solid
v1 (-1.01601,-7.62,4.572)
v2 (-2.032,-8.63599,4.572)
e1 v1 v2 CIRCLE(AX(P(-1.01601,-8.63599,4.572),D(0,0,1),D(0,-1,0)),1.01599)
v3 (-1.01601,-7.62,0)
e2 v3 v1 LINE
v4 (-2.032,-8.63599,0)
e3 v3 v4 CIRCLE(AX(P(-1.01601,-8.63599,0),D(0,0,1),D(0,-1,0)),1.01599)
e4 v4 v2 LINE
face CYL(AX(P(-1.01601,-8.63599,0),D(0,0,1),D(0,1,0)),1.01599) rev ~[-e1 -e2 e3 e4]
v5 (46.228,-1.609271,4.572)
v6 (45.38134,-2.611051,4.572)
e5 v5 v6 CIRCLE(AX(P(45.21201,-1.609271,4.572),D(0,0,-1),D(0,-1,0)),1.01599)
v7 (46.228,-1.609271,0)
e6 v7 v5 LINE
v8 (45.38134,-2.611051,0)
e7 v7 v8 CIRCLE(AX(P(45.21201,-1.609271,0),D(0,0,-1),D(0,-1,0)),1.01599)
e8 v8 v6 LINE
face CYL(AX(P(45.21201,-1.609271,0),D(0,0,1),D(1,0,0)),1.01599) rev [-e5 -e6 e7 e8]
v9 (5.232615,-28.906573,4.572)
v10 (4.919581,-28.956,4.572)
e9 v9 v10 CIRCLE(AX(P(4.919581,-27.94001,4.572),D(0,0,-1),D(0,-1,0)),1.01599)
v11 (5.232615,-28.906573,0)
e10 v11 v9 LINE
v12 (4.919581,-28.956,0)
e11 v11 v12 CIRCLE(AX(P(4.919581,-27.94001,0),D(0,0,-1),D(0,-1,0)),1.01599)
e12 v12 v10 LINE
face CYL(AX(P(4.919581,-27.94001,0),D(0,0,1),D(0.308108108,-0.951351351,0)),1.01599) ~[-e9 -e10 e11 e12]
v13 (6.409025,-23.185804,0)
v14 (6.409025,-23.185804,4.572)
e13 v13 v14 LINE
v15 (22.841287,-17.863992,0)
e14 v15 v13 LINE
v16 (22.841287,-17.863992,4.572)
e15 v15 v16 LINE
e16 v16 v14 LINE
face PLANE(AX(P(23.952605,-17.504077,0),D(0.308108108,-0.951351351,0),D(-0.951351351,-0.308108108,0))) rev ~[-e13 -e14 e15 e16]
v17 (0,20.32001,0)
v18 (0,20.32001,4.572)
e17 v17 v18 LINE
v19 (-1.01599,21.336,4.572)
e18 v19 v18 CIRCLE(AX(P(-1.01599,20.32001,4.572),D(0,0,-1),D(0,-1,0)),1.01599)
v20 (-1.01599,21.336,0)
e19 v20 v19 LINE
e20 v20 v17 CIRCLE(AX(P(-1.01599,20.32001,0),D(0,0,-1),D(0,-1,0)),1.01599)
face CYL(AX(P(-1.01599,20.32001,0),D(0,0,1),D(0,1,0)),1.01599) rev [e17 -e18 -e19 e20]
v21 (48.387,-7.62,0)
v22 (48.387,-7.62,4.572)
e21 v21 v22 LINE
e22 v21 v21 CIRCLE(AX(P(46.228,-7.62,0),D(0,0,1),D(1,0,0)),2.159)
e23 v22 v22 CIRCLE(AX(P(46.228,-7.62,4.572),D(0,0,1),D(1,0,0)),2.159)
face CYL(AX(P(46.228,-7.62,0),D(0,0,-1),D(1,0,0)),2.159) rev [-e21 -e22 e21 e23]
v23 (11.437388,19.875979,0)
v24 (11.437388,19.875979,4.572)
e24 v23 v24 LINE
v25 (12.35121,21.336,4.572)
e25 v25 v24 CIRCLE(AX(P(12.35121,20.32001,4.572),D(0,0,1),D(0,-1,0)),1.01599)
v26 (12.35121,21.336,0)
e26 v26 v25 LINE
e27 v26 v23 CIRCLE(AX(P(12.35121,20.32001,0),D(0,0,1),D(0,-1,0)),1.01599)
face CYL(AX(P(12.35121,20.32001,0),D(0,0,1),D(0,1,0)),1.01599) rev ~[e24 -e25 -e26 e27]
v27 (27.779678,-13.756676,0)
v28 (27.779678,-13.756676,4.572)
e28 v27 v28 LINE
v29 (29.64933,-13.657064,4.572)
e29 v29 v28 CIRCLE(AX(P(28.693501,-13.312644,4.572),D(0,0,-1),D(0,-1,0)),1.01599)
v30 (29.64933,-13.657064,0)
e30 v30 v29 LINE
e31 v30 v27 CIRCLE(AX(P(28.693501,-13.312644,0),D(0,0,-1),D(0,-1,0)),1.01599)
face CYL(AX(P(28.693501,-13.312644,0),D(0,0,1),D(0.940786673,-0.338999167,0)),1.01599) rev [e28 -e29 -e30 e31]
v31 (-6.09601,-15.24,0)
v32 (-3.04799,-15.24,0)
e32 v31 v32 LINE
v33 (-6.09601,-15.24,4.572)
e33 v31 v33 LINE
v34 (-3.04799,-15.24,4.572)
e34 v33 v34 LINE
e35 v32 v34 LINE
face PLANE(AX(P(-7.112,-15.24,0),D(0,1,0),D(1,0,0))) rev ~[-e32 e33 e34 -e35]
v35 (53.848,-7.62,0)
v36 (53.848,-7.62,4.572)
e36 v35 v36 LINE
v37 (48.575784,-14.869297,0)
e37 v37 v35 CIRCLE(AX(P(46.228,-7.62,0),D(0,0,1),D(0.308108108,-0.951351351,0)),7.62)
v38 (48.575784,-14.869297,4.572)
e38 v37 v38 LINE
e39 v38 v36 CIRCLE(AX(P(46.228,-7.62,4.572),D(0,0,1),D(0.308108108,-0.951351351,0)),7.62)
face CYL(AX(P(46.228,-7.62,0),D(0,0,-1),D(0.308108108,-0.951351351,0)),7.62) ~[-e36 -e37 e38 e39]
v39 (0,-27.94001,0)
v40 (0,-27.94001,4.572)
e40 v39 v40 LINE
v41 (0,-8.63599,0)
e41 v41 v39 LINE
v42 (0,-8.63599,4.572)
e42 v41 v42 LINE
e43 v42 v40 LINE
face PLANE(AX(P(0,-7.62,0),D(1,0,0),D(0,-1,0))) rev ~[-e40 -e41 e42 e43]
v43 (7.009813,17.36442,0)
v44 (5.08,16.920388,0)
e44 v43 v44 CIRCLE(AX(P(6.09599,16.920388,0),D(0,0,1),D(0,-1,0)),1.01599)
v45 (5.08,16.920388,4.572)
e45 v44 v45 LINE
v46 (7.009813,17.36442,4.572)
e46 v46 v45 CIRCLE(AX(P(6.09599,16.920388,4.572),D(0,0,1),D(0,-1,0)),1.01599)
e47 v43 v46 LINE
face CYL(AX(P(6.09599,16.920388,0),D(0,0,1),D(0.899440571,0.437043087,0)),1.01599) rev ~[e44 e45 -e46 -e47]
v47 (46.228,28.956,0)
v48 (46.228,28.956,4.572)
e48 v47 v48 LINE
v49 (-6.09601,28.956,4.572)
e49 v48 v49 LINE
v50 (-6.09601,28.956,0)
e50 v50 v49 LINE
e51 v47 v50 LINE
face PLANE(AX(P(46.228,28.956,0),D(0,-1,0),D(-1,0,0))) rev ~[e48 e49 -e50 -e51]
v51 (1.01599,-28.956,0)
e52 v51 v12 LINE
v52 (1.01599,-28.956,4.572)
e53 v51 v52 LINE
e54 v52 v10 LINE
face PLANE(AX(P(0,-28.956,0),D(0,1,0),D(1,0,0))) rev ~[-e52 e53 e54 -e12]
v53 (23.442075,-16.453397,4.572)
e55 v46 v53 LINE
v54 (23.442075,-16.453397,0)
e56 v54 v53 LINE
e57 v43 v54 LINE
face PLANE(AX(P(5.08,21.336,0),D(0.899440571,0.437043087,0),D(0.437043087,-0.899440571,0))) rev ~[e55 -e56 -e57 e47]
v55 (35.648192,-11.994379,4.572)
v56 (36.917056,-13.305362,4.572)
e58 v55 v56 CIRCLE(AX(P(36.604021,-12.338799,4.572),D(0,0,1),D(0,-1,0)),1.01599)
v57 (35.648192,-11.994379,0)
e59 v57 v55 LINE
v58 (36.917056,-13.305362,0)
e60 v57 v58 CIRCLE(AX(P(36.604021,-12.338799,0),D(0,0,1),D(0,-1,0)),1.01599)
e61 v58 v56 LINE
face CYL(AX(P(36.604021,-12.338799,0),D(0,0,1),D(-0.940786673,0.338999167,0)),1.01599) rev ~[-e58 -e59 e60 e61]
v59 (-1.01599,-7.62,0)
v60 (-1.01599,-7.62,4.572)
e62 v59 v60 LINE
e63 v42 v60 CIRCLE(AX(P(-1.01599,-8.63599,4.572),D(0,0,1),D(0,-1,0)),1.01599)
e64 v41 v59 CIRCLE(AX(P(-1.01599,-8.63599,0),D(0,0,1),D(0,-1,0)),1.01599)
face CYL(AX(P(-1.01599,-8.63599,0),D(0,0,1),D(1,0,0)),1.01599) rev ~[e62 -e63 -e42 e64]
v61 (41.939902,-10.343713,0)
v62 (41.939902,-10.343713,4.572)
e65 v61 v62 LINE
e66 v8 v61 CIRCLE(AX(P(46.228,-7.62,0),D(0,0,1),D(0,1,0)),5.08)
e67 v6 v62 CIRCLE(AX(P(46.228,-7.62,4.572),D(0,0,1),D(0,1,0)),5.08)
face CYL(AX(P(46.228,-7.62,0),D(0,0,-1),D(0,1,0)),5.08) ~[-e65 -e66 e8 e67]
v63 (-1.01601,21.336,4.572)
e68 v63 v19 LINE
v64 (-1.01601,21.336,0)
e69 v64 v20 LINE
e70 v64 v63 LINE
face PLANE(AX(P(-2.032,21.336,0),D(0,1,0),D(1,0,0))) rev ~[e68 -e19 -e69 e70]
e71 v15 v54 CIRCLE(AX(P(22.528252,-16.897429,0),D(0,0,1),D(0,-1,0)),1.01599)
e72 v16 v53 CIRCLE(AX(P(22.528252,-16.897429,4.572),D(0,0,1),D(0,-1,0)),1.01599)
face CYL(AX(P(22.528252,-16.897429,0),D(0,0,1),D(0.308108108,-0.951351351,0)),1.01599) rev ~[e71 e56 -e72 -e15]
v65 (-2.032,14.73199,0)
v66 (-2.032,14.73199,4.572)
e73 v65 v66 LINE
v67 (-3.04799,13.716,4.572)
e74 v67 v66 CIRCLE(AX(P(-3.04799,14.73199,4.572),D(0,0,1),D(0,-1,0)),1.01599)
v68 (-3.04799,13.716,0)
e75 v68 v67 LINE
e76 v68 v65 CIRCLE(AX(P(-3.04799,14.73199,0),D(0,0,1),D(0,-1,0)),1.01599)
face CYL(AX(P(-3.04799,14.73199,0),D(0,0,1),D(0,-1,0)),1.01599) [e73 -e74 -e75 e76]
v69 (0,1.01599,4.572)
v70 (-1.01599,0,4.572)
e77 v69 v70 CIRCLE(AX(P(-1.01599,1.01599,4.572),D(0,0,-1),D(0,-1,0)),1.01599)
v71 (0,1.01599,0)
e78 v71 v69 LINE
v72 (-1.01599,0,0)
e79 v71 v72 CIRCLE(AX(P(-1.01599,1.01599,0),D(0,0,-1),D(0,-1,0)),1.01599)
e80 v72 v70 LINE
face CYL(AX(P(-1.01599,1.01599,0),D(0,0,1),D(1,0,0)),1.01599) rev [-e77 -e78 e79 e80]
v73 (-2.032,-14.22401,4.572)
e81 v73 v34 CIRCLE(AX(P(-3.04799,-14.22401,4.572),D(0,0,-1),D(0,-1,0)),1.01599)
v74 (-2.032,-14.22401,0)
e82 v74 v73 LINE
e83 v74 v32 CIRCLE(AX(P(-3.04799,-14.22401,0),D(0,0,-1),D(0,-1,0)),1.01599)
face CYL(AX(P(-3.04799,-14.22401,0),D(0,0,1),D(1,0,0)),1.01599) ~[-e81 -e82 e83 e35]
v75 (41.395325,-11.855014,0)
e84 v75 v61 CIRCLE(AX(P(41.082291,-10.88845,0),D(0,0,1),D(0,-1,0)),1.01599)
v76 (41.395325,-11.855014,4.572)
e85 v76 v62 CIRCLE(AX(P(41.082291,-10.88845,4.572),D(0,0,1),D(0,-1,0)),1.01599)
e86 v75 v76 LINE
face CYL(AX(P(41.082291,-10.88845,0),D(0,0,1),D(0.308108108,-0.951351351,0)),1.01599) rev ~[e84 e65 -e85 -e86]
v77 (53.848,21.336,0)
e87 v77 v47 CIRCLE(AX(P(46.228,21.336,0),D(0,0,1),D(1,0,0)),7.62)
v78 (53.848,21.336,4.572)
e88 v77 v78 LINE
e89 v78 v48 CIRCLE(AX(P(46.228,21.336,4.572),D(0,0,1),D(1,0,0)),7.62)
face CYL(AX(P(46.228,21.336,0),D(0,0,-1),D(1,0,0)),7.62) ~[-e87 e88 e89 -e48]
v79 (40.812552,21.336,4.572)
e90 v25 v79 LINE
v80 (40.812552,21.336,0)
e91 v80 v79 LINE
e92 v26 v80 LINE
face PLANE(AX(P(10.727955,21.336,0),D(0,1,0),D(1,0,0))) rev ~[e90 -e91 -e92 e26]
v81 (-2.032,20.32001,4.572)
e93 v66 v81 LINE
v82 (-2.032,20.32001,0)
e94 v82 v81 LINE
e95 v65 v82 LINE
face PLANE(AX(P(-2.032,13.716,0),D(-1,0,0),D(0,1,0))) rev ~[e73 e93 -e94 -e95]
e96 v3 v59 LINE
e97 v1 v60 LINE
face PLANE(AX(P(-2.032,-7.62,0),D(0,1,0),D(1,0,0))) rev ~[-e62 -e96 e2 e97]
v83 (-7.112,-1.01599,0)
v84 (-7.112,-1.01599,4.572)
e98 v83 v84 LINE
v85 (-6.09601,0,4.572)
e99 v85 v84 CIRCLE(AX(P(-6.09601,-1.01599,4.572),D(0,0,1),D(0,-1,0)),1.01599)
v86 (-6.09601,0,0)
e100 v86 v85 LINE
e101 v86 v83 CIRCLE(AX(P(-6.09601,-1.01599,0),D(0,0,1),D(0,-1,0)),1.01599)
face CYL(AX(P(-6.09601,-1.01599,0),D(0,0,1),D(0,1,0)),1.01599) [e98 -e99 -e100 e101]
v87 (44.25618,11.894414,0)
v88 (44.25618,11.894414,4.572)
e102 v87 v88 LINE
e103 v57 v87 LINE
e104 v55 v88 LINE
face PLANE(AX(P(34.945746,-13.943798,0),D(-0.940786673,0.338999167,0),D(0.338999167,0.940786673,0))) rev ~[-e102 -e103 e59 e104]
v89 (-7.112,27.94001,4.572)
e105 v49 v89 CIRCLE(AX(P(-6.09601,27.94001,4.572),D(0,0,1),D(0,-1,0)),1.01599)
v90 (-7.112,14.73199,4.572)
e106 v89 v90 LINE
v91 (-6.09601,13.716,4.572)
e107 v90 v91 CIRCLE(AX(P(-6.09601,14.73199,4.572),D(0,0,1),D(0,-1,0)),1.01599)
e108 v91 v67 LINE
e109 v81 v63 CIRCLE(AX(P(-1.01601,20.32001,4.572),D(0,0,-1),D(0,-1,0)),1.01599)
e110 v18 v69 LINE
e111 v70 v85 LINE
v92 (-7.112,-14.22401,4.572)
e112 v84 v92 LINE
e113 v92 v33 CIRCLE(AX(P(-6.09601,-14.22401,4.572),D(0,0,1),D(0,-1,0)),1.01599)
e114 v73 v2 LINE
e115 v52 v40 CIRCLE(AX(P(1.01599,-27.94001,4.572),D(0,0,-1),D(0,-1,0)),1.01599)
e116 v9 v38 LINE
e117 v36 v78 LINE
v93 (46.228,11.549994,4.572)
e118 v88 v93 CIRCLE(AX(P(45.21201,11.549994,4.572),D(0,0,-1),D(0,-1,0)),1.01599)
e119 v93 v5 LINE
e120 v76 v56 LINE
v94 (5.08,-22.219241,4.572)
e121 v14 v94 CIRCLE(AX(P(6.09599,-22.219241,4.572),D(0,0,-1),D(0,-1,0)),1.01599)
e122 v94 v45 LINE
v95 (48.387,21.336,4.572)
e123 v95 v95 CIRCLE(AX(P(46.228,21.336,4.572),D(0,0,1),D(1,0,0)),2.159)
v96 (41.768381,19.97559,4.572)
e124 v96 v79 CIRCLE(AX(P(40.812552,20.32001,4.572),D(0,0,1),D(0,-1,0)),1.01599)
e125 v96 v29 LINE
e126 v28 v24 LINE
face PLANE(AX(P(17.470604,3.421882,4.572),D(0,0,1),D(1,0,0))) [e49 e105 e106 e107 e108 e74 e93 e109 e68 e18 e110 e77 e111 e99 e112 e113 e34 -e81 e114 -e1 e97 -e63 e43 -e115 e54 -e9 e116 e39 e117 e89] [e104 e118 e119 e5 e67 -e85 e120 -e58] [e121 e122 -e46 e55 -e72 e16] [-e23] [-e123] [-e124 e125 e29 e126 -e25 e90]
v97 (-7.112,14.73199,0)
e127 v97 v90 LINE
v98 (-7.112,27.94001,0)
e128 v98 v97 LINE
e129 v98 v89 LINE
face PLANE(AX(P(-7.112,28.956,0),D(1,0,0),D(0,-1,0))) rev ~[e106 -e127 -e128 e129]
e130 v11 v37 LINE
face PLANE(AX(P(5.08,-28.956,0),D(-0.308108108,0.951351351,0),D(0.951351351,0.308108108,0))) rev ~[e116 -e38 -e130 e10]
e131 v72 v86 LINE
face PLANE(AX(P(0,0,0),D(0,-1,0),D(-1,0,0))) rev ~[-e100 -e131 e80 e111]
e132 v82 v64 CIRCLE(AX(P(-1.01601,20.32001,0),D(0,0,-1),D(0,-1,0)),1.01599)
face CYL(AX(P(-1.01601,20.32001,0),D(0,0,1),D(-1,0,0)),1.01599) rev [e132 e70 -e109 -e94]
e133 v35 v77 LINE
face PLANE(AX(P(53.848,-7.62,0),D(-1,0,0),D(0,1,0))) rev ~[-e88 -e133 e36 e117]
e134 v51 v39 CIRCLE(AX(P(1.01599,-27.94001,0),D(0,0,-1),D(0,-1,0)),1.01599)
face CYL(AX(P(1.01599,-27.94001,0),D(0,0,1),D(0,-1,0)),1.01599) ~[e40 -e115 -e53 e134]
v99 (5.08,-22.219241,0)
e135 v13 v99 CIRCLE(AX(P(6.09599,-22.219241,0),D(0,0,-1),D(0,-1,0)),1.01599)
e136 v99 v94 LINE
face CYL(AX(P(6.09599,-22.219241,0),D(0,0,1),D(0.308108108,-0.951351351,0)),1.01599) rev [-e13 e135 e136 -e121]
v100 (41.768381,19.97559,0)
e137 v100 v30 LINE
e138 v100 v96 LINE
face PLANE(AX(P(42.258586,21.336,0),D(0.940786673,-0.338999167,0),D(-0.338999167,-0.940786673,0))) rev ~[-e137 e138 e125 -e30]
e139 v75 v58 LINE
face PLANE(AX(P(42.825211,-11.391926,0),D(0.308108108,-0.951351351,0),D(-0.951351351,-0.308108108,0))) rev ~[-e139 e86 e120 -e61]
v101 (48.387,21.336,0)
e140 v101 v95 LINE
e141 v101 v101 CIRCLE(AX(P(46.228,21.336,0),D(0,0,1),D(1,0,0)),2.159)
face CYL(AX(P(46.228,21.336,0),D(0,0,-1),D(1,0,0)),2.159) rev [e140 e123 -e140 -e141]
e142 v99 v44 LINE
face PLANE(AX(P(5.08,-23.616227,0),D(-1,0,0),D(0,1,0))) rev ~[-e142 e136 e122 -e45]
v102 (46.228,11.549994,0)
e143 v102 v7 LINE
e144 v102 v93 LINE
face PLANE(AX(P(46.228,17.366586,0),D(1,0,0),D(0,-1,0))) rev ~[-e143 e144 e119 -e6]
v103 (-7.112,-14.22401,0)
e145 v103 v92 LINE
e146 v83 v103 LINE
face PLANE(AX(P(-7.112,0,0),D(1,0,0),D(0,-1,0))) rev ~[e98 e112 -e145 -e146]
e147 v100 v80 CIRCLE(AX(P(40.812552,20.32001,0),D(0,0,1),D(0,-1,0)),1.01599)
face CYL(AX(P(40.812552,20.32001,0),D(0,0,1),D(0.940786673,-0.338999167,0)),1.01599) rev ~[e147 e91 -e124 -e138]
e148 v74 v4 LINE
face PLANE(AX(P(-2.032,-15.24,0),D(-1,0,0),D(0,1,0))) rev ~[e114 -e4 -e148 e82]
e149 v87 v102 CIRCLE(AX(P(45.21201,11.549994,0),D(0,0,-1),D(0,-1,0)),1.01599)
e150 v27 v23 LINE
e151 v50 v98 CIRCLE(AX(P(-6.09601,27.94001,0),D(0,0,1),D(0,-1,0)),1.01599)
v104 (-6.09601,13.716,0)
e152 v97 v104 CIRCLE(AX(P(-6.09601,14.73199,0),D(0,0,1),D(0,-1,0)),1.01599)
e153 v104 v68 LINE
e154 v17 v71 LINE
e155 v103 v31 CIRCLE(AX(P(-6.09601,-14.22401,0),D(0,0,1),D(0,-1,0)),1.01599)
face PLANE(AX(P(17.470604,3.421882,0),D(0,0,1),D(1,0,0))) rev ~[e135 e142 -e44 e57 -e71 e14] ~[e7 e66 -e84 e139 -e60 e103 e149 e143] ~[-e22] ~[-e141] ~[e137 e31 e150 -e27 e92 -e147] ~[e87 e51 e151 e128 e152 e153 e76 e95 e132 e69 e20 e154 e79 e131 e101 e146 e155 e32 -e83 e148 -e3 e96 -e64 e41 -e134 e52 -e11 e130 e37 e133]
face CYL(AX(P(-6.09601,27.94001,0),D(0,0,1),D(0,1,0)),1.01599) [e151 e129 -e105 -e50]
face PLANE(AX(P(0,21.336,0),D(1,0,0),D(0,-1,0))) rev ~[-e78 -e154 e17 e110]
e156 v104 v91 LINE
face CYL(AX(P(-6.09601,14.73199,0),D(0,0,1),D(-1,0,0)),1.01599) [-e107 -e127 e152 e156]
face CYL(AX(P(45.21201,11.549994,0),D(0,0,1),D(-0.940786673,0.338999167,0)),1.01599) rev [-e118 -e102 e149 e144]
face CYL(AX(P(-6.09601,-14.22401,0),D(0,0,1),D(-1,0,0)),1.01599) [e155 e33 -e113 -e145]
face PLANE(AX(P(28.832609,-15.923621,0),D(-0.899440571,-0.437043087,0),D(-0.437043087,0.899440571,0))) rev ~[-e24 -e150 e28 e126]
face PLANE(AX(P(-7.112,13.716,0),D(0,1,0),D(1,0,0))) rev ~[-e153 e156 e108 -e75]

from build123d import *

# Parameters (mm, degrees)
F0_R     = 2.159
F1_DEPTH = 4.572
F2_R     = 1.01599


# Not quite as in the source:
# - a fillet or chamfer is up to 0.001 mm smaller than in the source, because OpenCascade refuses the exact size


with BuildPart() as f1:
    # F0 (on Top) → F1 (new body)
    with BuildSketch(Plane.XY):
        with BuildLine():
            Line((46.228, 28.956), (-7.112, 28.956))
            Line((-7.112, 28.956), (-7.112, 13.716))
            Line((-7.112, 13.716), (-2.032, 13.716))
            Line((-2.032, 13.716), (-2.032, 21.336))
            Line((-2.032, 21.336), (0, 21.336))
            Line((0, 21.336), (0, 0))
            Line((0, 0), (-7.112, 0))
            Line((-7.112, 0), (-7.112, -15.24))
            Line((-7.112, -15.24), (-2.032, -15.24))
            Line((-2.032, -15.24), (-2.032, -7.62))
            Line((-2.032, -7.62), (0, -7.62))
            Line((0, -7.62), (0, -28.956))
            Line((0, -28.956), (5.08, -28.956))
            Line((5.08, -28.956), (48.5757837838, -14.8692972973))
            ThreePointArc((48.5757837838, -14.8692972973), (52.3905689624, -12.1018683363), (53.848, -7.62))
            Line((53.848, -7.62), (53.848, 21.336))
            ThreePointArc((53.848, 21.336), (51.6161536726, 26.7241536726), (46.228, 28.956))
        make_face()
        Polygon((5.08, -23.6162272727), (5.08, 21.336), (23.9526054243, -17.5040766524), align=None, mode=Mode.SUBTRACT)
        with Locations((46.228, -7.62)):
            Circle(F0_R, mode=Mode.SUBTRACT)
        Polygon((28.8326085769, -15.9236210859), (10.7279551462, 21.336), (42.2585858686, 21.336), align=None, mode=Mode.SUBTRACT)
        with BuildLine():
            Line((46.228, 17.3665858686), (46.228, -2.54))
            ThreePointArc((46.228, -2.54), (41.4862817332, -5.7972252255), (42.8252108486, -11.391926032))
            Line((42.8252108486, -11.391926032), (34.9457461194, -13.9437981318))
            Line((34.9457461194, -13.9437981318), (46.228, 17.3665858686))
        make_face(mode=Mode.SUBTRACT)
        with Locations((46.228, 21.336)):
            Circle(F0_R, mode=Mode.SUBTRACT)
    extrude(amount=F1_DEPTH)

    # F2 (radius 1.016 in the source; OpenCascade refuses exactly that, so slightly less here)
    f2_edges = [f1.edges().sort_by_distance(p)[0] for p in [
        (46.228, 17.366586, 2.286),
        (5.08, 21.336, 2.286),
        (10.727955, 21.336, 2.286),
        (42.258586, 21.336, 2.286),
        (23.952605, -17.504077, 2.286),
        (5.08, -23.616227, 2.286),
        (28.832609, -15.923621, 2.286),
        (46.228, -2.54, 2.286),
        (42.825211, -11.391926, 2.286),
        (34.945746, -13.943798, 2.286),
        (5.08, -28.956, 2.286),
        (0, -28.956, 2.286),
        (0, -7.62, 2.286),
        (-2.032, -7.62, 2.286),
        (-2.032, -15.24, 2.286),
        (-7.112, -15.24, 2.286),
        (0, 21.336, 2.286),
        (-2.032, 13.716, 2.286),
        (-7.112, 13.716, 2.286),
        (-7.112, 0, 2.286),
        (0, 0, 2.286),
        (-2.032, 21.336, 2.286),
        (-7.112, 28.956, 2.286),
    ]]
    fillet(f2_edges, radius=F2_R)


solid = f1.part
